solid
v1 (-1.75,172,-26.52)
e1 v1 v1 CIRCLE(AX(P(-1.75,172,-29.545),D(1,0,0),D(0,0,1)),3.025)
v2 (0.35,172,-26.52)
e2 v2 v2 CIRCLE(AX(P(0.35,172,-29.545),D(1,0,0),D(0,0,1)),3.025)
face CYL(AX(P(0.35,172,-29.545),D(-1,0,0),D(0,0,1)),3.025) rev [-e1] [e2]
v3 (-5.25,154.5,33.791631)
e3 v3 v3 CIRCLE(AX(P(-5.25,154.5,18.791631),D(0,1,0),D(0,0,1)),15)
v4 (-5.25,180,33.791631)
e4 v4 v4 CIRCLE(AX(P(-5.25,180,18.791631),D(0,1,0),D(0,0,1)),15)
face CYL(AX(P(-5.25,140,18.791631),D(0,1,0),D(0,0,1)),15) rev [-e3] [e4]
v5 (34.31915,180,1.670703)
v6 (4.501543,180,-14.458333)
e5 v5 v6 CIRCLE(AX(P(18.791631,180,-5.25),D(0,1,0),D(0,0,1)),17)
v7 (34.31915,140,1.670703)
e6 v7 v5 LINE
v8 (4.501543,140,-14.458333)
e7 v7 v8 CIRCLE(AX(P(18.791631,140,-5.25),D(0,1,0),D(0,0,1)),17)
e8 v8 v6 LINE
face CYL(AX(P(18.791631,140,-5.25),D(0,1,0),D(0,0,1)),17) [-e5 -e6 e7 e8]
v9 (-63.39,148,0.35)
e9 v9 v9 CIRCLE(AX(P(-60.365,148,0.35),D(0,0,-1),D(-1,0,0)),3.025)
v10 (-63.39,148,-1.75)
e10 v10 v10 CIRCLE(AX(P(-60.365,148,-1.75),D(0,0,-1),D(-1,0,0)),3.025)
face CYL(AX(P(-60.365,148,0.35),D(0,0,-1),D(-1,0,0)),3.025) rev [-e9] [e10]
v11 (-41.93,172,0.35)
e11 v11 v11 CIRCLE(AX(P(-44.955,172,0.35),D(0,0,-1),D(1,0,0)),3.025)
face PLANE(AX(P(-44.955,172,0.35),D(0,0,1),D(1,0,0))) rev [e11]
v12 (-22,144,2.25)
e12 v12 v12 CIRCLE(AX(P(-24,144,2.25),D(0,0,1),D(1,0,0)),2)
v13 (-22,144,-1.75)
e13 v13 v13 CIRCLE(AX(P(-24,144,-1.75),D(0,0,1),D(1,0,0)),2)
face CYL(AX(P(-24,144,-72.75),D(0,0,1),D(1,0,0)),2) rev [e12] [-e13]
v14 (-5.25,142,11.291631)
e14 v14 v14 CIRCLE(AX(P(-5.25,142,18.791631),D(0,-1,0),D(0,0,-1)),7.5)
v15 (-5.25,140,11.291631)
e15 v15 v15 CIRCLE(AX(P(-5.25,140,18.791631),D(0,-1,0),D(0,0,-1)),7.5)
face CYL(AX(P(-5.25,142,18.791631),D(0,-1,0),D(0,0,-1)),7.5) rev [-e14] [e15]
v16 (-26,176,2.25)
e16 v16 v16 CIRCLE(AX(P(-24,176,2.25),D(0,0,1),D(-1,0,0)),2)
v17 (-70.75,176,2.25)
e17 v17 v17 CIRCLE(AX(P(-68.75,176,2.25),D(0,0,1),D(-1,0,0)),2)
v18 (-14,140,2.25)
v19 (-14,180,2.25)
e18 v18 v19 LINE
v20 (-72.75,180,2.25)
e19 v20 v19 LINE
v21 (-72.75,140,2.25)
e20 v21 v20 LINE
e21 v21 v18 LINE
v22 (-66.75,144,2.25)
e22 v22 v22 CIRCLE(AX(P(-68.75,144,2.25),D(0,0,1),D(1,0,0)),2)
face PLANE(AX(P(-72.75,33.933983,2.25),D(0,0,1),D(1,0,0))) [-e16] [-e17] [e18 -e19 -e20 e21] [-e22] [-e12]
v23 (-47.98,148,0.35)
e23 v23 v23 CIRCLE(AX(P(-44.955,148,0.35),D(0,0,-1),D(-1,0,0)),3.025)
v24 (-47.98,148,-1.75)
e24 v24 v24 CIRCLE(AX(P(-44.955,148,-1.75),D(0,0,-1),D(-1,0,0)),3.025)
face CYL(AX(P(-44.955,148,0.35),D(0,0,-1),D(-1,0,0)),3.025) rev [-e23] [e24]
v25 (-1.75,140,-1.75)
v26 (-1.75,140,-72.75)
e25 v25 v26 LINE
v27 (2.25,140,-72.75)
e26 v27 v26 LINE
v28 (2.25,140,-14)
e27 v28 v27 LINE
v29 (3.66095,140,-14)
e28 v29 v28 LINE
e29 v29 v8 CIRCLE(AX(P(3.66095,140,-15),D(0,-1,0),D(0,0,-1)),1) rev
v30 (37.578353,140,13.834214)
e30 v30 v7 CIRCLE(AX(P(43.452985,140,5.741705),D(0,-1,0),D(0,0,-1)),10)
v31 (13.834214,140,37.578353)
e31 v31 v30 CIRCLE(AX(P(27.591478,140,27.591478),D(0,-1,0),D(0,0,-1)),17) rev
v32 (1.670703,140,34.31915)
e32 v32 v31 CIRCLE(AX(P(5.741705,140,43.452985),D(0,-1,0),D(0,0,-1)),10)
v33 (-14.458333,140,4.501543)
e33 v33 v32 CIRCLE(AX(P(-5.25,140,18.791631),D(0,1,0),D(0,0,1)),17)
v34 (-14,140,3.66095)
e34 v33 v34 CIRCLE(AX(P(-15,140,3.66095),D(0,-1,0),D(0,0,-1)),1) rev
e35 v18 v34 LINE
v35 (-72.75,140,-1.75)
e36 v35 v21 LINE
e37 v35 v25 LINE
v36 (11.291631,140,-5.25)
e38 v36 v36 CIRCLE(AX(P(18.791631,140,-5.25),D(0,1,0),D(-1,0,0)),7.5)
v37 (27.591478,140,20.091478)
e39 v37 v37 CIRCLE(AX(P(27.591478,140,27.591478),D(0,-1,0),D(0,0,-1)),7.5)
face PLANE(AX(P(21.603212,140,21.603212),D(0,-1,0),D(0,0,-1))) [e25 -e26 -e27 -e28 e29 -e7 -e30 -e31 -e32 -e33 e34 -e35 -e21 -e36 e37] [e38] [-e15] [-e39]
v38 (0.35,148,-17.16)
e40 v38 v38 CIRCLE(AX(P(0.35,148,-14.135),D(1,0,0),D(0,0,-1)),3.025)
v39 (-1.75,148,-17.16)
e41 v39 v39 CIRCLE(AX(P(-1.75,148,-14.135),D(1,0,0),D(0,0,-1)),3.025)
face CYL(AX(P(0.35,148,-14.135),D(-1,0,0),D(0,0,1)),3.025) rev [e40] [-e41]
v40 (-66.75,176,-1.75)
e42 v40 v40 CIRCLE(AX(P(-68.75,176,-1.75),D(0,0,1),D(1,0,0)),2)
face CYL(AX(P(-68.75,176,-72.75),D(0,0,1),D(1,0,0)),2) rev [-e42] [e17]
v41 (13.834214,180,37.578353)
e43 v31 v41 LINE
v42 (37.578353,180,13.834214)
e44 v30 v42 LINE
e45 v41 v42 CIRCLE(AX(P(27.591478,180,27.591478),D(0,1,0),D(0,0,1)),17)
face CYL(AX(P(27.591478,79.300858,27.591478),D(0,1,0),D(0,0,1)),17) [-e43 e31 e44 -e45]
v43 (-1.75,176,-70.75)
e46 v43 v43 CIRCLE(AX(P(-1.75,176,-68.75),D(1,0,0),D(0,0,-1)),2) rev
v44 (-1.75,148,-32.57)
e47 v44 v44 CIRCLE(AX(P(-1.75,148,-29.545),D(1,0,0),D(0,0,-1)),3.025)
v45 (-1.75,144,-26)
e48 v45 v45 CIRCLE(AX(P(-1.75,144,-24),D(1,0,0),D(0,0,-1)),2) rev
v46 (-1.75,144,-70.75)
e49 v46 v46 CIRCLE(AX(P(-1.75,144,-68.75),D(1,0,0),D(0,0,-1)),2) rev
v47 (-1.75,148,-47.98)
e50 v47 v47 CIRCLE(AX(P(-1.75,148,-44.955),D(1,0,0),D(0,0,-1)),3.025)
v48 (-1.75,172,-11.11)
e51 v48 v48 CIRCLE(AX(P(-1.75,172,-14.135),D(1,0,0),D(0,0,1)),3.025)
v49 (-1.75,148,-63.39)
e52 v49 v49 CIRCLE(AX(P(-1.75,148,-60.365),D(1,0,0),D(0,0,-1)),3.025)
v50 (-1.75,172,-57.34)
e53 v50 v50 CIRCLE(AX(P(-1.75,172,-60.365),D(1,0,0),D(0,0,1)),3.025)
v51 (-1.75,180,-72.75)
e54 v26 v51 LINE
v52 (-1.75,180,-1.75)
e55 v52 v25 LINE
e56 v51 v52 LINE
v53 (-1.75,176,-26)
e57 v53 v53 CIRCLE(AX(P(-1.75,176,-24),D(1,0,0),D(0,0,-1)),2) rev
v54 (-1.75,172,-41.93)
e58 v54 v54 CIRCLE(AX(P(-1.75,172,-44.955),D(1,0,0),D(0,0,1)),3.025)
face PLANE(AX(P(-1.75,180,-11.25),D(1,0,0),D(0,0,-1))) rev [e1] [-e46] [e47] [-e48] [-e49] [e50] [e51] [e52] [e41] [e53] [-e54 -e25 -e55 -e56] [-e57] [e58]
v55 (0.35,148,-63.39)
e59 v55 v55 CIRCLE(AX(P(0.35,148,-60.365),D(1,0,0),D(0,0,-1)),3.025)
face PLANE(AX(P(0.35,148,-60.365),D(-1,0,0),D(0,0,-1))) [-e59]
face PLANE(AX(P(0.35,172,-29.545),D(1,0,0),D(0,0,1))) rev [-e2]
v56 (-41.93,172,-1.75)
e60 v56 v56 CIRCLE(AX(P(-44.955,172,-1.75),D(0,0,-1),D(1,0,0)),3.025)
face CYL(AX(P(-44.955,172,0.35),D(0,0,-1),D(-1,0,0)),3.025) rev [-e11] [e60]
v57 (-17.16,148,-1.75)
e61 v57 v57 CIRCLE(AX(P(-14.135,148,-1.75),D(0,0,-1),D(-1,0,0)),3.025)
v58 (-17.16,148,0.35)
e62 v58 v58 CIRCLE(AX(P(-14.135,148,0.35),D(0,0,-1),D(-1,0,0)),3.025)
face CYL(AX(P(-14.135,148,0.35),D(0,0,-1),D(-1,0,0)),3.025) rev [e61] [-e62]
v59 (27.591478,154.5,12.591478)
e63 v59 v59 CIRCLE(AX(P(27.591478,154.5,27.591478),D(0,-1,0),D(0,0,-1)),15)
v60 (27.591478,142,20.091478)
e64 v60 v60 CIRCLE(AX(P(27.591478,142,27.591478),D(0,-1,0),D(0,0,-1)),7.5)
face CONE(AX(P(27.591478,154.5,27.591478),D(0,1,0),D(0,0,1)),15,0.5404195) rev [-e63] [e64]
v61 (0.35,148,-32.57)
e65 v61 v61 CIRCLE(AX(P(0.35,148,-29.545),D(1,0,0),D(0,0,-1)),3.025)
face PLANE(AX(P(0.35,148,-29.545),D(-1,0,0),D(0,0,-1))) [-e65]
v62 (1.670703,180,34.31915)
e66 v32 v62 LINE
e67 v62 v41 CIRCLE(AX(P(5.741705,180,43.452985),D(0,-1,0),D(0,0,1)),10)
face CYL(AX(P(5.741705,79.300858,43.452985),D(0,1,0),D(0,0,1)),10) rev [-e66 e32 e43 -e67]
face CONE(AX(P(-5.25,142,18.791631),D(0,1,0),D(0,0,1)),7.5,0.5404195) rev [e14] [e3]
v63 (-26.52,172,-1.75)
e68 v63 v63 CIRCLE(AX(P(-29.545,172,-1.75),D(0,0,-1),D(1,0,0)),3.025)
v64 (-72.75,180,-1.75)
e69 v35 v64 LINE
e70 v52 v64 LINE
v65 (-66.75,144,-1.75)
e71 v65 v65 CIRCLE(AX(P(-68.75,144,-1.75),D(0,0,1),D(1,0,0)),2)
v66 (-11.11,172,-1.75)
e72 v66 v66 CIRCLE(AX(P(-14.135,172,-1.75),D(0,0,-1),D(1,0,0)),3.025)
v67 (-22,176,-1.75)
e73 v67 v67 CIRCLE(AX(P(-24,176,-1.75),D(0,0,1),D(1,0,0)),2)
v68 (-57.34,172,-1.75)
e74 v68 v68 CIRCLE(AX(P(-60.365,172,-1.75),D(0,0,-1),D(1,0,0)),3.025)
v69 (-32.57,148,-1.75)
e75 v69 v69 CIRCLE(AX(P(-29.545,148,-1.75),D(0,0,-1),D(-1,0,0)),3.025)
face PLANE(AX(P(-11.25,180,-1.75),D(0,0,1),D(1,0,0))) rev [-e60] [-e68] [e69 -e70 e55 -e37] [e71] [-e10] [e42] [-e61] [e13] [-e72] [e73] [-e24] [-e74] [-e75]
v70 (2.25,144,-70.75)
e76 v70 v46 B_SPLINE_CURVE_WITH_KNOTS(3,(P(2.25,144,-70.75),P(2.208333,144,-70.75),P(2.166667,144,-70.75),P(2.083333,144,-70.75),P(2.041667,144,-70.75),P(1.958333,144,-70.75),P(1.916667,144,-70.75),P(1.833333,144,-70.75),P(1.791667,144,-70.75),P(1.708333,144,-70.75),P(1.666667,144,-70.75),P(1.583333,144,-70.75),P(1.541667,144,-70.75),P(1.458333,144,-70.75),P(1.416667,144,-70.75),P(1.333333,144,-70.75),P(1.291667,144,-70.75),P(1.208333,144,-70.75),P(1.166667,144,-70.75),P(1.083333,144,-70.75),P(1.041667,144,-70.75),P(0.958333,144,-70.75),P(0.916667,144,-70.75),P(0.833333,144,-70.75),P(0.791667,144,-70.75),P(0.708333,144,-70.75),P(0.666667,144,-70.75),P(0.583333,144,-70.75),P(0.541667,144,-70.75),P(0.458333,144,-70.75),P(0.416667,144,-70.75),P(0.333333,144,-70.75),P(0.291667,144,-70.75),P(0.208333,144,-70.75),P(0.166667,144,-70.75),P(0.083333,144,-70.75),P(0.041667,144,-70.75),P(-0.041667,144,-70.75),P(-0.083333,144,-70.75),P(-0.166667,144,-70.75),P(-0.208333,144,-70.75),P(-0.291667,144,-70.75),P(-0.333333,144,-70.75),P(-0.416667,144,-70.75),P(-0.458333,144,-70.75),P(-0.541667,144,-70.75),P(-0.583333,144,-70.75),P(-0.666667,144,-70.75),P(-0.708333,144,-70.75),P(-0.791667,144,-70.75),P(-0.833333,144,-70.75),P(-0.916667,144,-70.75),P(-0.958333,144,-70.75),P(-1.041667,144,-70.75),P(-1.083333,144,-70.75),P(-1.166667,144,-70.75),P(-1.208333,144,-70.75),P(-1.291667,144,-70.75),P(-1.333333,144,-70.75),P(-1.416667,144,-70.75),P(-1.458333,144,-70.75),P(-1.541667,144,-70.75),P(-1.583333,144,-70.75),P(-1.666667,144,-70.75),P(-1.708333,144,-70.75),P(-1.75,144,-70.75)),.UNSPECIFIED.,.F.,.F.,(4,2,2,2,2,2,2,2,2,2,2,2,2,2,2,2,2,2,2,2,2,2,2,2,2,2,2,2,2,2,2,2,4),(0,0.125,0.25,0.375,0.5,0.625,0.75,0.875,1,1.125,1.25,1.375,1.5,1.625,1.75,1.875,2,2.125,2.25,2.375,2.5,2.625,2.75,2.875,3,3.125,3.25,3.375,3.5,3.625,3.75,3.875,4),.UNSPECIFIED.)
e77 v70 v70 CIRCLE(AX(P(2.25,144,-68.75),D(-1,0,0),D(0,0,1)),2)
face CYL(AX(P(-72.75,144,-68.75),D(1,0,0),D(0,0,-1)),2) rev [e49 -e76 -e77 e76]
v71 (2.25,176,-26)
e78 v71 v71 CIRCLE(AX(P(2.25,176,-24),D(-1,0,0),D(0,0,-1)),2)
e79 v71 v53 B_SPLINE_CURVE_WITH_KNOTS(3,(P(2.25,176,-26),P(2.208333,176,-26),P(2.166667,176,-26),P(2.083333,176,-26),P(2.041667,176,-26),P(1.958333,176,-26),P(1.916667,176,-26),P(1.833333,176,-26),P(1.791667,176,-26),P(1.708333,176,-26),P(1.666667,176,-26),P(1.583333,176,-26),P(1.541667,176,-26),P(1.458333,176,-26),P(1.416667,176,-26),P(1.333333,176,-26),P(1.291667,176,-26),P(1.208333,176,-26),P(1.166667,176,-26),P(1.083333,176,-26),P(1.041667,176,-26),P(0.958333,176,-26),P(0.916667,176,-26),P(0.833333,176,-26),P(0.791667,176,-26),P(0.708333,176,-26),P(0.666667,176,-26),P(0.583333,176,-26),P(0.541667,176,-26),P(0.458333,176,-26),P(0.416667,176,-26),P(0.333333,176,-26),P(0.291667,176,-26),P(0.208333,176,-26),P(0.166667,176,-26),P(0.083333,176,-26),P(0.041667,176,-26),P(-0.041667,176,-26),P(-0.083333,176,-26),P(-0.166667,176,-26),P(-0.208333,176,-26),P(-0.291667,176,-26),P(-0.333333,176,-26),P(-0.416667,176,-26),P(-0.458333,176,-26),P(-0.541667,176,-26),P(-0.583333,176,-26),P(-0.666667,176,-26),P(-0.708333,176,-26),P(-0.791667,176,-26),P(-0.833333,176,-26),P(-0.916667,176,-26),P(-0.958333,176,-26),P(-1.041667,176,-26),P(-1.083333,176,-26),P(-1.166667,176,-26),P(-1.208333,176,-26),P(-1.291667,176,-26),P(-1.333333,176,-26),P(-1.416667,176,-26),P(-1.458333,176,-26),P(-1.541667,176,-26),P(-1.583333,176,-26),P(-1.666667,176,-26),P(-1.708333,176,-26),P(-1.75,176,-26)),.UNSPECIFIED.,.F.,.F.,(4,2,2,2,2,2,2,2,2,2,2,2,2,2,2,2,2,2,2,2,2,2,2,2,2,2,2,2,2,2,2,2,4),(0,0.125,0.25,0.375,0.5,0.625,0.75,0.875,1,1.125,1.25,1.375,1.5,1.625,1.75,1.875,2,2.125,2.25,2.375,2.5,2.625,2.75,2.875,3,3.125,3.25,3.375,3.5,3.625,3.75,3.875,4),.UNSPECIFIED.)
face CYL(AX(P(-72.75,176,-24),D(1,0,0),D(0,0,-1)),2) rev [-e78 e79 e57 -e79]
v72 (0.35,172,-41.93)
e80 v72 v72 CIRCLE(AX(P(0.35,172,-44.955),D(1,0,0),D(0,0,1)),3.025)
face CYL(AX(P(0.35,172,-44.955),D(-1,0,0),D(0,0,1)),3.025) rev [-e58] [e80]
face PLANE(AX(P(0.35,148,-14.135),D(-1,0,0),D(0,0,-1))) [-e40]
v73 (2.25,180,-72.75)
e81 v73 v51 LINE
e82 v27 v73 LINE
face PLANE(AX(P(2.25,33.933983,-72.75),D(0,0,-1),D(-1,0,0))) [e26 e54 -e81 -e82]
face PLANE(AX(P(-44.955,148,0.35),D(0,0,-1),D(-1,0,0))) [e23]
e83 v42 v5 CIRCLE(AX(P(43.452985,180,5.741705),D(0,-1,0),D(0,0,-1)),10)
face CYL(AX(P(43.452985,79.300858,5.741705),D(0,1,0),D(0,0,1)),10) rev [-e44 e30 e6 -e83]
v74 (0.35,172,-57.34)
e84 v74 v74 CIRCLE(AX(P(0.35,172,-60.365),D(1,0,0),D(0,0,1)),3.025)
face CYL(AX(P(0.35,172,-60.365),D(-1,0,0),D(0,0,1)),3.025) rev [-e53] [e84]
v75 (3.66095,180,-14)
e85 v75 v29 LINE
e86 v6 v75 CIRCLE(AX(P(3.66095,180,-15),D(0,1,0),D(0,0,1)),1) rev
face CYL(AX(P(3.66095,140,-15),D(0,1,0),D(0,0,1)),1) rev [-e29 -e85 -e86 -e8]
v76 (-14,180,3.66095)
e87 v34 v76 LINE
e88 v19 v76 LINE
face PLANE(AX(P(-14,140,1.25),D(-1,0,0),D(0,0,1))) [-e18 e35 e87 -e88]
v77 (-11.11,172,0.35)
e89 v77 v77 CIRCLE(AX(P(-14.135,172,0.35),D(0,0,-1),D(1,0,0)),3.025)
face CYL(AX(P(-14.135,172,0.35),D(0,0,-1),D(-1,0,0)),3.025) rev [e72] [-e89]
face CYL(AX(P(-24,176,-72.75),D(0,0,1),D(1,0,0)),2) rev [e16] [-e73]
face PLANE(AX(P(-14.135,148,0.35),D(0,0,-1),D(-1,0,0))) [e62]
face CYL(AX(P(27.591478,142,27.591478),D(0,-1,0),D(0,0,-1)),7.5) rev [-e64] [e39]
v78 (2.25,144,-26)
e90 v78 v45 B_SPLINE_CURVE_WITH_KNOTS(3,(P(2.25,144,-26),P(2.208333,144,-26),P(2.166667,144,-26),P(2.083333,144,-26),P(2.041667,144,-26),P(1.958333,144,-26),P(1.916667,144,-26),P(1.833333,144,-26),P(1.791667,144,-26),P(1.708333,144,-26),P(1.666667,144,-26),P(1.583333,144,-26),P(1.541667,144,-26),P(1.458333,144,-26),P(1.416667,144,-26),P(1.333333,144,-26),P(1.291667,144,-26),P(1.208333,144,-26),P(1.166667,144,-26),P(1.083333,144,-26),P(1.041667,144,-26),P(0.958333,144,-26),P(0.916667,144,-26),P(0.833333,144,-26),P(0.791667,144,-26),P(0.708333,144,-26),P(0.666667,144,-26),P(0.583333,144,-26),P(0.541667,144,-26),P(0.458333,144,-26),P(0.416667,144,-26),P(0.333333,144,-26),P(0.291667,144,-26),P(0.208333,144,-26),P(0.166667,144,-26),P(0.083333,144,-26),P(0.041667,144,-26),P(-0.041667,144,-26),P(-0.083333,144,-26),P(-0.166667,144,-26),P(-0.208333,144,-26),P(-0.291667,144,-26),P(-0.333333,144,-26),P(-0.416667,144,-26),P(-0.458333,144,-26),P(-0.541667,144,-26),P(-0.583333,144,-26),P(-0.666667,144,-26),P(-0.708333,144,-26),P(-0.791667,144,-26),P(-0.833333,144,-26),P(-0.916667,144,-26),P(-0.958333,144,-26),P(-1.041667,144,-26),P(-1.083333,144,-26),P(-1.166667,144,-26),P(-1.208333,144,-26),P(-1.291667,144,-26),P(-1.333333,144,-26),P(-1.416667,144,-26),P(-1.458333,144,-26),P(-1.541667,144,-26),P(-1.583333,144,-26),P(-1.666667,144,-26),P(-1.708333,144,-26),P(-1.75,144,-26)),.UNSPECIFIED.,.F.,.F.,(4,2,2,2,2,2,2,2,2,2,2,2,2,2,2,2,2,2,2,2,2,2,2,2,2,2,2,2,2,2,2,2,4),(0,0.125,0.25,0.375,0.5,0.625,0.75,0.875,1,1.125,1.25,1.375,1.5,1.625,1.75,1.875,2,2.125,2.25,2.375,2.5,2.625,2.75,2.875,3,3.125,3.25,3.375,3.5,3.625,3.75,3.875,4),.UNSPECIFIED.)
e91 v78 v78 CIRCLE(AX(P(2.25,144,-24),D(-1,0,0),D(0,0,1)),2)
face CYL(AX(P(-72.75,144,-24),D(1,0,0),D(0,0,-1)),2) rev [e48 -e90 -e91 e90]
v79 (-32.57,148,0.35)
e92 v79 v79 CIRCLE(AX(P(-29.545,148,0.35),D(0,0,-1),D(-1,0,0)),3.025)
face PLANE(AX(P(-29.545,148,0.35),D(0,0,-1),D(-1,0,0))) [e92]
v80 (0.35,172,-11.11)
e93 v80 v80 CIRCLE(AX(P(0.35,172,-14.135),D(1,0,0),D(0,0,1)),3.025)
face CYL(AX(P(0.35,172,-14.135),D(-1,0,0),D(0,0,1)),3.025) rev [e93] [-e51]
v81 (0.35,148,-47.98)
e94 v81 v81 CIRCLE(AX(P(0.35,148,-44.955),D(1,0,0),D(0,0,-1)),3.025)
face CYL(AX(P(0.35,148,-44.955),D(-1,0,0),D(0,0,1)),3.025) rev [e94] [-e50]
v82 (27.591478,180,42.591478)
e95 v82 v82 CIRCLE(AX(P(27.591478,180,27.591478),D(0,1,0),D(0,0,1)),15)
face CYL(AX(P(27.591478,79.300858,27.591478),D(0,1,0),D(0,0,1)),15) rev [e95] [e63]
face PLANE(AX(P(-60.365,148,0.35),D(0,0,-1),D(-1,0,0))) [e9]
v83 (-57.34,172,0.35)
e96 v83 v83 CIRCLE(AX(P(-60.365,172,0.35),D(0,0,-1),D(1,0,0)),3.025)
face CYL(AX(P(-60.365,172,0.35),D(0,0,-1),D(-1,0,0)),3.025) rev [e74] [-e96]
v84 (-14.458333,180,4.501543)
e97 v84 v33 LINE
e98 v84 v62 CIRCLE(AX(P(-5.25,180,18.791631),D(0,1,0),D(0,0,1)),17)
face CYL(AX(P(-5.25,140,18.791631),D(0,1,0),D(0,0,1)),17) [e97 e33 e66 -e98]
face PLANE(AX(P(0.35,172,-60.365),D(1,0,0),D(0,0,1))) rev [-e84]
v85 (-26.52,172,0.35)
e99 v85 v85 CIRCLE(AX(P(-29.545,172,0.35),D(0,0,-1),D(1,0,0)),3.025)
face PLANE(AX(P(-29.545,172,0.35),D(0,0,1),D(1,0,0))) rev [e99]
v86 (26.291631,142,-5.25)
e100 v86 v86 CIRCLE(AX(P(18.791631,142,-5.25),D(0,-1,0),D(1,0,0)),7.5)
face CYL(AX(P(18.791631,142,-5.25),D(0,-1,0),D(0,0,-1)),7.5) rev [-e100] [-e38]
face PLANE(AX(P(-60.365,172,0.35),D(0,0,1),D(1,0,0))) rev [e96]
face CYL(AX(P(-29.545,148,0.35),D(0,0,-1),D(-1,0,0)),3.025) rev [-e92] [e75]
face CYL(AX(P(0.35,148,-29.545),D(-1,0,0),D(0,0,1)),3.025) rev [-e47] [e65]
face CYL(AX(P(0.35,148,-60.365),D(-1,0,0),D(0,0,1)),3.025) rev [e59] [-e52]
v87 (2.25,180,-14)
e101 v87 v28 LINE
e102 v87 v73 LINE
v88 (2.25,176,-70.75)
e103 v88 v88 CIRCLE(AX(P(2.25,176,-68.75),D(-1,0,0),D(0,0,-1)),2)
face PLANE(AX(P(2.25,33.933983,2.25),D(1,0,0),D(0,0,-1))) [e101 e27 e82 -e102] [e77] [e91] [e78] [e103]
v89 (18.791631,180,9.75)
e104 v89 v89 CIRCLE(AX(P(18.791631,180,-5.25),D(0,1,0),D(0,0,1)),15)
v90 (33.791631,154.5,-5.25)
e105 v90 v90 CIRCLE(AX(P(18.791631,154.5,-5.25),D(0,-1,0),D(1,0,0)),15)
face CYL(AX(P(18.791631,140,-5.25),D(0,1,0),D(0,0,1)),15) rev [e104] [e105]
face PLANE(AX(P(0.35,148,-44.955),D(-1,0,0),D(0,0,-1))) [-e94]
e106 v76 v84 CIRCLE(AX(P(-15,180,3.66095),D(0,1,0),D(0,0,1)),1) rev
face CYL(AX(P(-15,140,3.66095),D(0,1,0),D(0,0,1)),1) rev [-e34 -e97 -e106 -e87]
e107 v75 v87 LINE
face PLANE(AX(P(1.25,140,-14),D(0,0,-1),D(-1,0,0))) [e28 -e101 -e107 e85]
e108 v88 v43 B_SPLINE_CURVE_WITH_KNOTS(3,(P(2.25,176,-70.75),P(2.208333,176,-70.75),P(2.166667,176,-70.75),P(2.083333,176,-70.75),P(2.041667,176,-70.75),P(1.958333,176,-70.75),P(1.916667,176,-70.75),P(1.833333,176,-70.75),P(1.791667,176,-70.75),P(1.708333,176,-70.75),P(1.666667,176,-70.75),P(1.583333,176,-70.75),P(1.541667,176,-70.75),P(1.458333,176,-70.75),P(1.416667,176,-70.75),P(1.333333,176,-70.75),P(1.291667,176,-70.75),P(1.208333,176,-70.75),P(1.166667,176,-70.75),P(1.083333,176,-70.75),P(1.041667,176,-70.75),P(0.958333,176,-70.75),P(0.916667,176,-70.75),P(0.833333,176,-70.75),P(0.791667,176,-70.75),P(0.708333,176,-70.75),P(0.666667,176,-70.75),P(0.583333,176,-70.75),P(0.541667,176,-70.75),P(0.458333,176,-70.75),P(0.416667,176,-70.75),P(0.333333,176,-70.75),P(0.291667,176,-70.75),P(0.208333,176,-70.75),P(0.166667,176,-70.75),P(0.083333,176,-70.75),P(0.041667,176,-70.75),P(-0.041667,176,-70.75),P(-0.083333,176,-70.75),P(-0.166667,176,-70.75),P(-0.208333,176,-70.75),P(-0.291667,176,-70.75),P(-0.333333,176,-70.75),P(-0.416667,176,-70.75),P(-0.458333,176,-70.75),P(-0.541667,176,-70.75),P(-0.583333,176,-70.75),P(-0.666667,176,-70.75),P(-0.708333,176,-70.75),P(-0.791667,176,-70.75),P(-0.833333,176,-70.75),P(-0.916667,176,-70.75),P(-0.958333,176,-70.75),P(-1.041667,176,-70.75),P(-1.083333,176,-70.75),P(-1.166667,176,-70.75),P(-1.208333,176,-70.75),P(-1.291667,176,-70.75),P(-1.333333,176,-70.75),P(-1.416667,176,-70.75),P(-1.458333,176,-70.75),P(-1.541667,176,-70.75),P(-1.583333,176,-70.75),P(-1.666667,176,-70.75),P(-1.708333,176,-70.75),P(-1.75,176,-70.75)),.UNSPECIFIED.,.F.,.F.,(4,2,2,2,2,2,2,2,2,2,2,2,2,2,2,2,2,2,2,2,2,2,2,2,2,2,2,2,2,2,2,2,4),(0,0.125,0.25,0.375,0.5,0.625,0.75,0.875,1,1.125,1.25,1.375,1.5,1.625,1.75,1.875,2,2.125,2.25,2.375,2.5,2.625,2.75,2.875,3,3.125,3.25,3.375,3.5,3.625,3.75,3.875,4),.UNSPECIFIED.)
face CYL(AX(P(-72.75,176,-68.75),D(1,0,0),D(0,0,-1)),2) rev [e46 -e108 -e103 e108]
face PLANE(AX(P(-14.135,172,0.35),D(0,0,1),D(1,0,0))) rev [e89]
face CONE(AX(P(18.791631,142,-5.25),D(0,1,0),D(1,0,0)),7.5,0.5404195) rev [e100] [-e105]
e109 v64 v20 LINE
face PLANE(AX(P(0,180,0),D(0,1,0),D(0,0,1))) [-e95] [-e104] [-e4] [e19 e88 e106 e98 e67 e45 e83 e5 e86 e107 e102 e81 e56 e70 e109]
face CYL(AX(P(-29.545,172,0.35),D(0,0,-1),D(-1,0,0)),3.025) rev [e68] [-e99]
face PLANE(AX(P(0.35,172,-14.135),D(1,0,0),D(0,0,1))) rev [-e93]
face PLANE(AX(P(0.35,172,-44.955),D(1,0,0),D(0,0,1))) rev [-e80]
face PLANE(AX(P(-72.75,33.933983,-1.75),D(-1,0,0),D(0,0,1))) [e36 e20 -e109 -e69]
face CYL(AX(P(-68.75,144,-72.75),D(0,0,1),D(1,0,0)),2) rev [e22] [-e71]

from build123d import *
from build123d.topology import SkipClean

# Parameters (mm, degrees)
SKETCH1_W            = 30
SKETCH1_H            = 30
BOSS_EXTRUDE1_DEPTH  = 80
SKETCH2_R            = 6
BOSS_EXTRUDE2_DEPTH  = 22
CUT_EXTRUDE1_DEPTH   = 83.764726786
BOSS_EXTRUDE3_DEPTH  = 100
BOSS_EXTRUDE5_DEPTH  = 2
BOSS_EXTRUDE6_DEPTH  = 23
BOSS_EXTRUDE7_DEPTH  = 25
FILLET1_R            = 2
SKETCH11_R           = 6.055782361
CUT_EXTRUDE2_DEPTH   = 2.125
SKETCH12_W           = 13.25
SKETCH12_H           = 8.5
CUT_EXTRUDE4_DEPTH   = 13.25
CUT_EXTRUDE5_REACH   = 204.341
SKETCH15_W           = 3.75
SKETCH15_H           = 3.75
FILLET2_R            = 1
CUT_EXTRUDE7_START   = 22
SKETCH16_R           = 6
CUT_EXTRUDE7_DEPTH   = 22
SKETCH17_R           = 15
BOSS_EXTRUDE8_DEPTH  = 40
FILLET3_R            = 1
SKETCH18_R           = 15
SKETCH18_R_2         = 7.5
BOSS_EXTRUDE9_DEPTH  = 2
SKETCH22_R           = 209.016423622
CUT_EXTRUDE8_DEPTH   = 225.815151847
SKETCH23_W           = 22.070362909
SKETCH23_H           = 16.212180161
CUT_EXTRUDE9_DEPTH   = 65.514197169
SKETCH24_R           = 15
BOSS_EXTRUDE10_DEPTH = 40
SKETCH25_R           = 15
SKETCH25_R_2         = 7.5
BOSS_EXTRUDE11_DEPTH = 2
BOSS_EXTRUDE12_DEPTH = 40
SKETCH29_R           = 2
CUT_EXTRUDE10_DEPTH  = 209.128716183
SKETCH30_R           = 3.025
CUT_EXTRUDE11_DEPTH  = 2.1


with BuildPart() as part:
    # Sketch1 → Boss-Extrude1 (new body)
    with BuildSketch(Plane(origin=(0, 0, 0), x_dir=(1, 0, 0), z_dir=(0, 1, 0))):
        Rectangle(SKETCH1_W, SKETCH1_H)
    extrude(amount=BOSS_EXTRUDE1_DEPTH)

    # Sketch2 → Boss-Extrude2 (add)
    with BuildSketch(Plane(origin=(0, 80, 0), x_dir=(1, 0, 0), z_dir=(0, 1, 0))):
        with Locations(Location((9, -9, 0), (0, 0, 270))):
            Circle(SKETCH2_R)
    extrude(amount=BOSS_EXTRUDE2_DEPTH)

    # Sketch3 → Cut-Extrude1 (cut, through all)
    with BuildSketch(Plane(origin=(0, 80, 0), x_dir=(1, 0, 0), z_dir=(0, 1, 0))):
        with BuildLine():
            Line((9, -15), (15, -15))
            Line((15, -15), (15, -9))
            ThreePointArc((15, -9), (13.242640687, -13.242640687), (9, -15))
        make_face()
    extrude(amount=-CUT_EXTRUDE1_DEPTH, mode=Mode.SUBTRACT)

    # Sketch4 → Boss-Extrude3 (add)
    with BuildSketch(Plane(origin=(0, 80, 0), x_dir=(1, 0, 0), z_dir=(0, 1, 0))):
        Polygon((-8.25, 11.25), (-8.25, 8.25), (-11.25, 8.25), (-15, 8.25), (-15, 11.25), (-11.25, 11.25), (-11.25, 15), (-8.25, 15), align=None)
        Polygon((-1.75, 1.75), (-11.25, 1.75), (-15, 1.75), (-15, -1.25), (-11.25, -1.25), (1.25, -1.25), (1.25, 11.25), (1.25, 15), (-1.75, 15), (-1.75, 11.25), align=None)
    extrude(amount=BOSS_EXTRUDE3_DEPTH)

    # Sketch6 → Boss-Extrude5 (add)
    with BuildSketch(Plane.XZ):
        with BuildLine():
            Line((15, -15), (7, -15))
            Line((7, -15), (7, -99.5))
            ThreePointArc((7, -99.5), (2.757359313, -109.742640687), (13, -105.5))
            Line((13, -105.5), (15, -105.5))
            Line((15, -105.5), (15, -15))
        make_face()
    extrude(amount=-BOSS_EXTRUDE5_DEPTH)

    # Sketch7 → Boss-Extrude6 (add)
    with SkipClean():  # the faces are left unmerged after this step: merging them gives an invalid solid
        with BuildSketch(Plane(origin=(0, 2, 0), x_dir=(1, 0, 0), z_dir=(0, 1, 0))):
            with BuildLine():
                Line((9, 111.156854249), (9, 108.964101615))
                ThreePointArc((9, 108.964101615), (7, 101.5), (5, 108.964101615))
                Line((5, 108.964101615), (5, 111.156854249))
                ThreePointArc((5, 111.156854249), (1.086408642, 104.485388128), (7, 99.5))
                Line((7, 99.5), (7, 15))
                Line((7, 15), (15, 15))
                Line((15, 15), (15, 105.5))
                Line((15, 105.5), (13, 105.5))
                ThreePointArc((13, 105.5), (11.898979486, 108.964101615), (9, 111.156854249))
            make_face()
        extrude(amount=BOSS_EXTRUDE6_DEPTH)

    # Sketch9 → Boss-Extrude7 (add)
    with SkipClean():  # the faces are left unmerged after this step: merging them gives an invalid solid
        with BuildSketch(Plane.XZ):
            with BuildLine():
                Line((-15, 15), (-15, 7))
                Line((-15, 7), (-126.175, 7))
                ThreePointArc((-126.175, 7), (-126.252697751, 6.037536458), (-126.48377869, 5.1))
                Line((-126.48377869, 5.1), (-128.797778509, 5.1))
                ThreePointArc((-128.797778509, 5.1), (-136.05, 7), (-128.797778509, 8.9))
                Line((-128.797778509, 8.9), (-126.3, 8.9))
                ThreePointArc((-126.3, 8.9), (-128.491885554, 11.955834237), (-132.050001601, 13.173329766))
                Line((-132.050001601, 13.173329766), (-132.050001601, 15))
                Line((-132.050001601, 15), (-15, 15))
            make_face()
        extrude(amount=-BOSS_EXTRUDE7_DEPTH)

    # Fillet1
    fillet1_edges = [part.edges().sort_by_distance(p)[0] for p in [
        (-126.175, 12.5, 7),
    ]]
    fillet(fillet1_edges, radius=FILLET1_R)

    # Sketch11 → Cut-Extrude2 (cut)
    with SkipClean():  # the faces are left unmerged after this step: merging them gives an invalid solid
        with BuildSketch(Plane.XZ):
            with Locations((-132.175, 7)):
                Circle(SKETCH11_R)
        extrude(amount=-CUT_EXTRUDE2_DEPTH, mode=Mode.SUBTRACT)

    # Sketch12 → Cut-Extrude4 (cut)
    with SkipClean():  # the faces are left unmerged after this step: merging them gives an invalid solid
        with BuildSketch(Plane.ZY.offset(15)):
            with Locations((-8.375, 72.75)):
                Rectangle(SKETCH12_W, SKETCH12_H)
        extrude(amount=-CUT_EXTRUDE4_DEPTH, mode=Mode.SUBTRACT)

    # Sketch15 → Cut-Extrude5 (cut, up to next)
    with BuildSketch(Plane(origin=(0, 80, 0), x_dir=(1, 0, 0), z_dir=(0, 1, 0)), mode=Mode.PRIVATE) as cut_extrude5_sk1:
        with Locations((-13.125, 13.125)):
            Rectangle(SKETCH15_W, SKETCH15_H)
    cut_extrude5_tool1 = extrude(cut_extrude5_sk1.sketch, amount=-CUT_EXTRUDE5_REACH, mode=Mode.PRIVATE) & part.part
    add(cut_extrude5_tool1.solids().sort_by_distance((-13.125, 80, -13.125))[0], mode=Mode.SUBTRACT)

    # Fillet2
    fillet2_edges = [part.edges().sort_by_distance(p)[0] for p in [
        (-11.25, 130, -15),
        (-11.25, 130, -11.25),
        (-15, 130, -11.25),
        (-15, 130, 1.25),
        (1.25, 130, -15),
    ]]
    fillet(fillet2_edges, radius=FILLET2_R)

    # Sketch16 → Cut-Extrude7 (cut)
    with SkipClean():  # the faces are left unmerged after this step: merging them gives an invalid solid
        with BuildSketch(Plane(origin=(0, 80, 0), x_dir=(1, 0, 0), z_dir=(0, 1, 0)).offset(CUT_EXTRUDE7_START)):
            with Locations((9, -9)):
                Circle(SKETCH16_R)
        extrude(amount=-CUT_EXTRUDE7_DEPTH, mode=Mode.SUBTRACT)


with BuildPart() as cut_extrude7_kept_piece:
    # of the separate pieces the step leaves, the one the design keeps (cut_extrude7_pieces_kept)
    add(part.part.solids().sort_by_distance((-15, 80, 0.25))[0])

    # Sketch17 → Boss-Extrude8 (add)
    with SkipClean():  # the faces are left unmerged after this step: merging them gives an invalid solid
        with BuildSketch(Plane(origin=(0, 180, 0), x_dir=(1, 0, 0), z_dir=(0, 1, 0))):
            with BuildLine():
                Line((-14, -1.25), (-14, -4.216394713))
                ThreePointArc((-14, -4.216394713), (-14.384018227, -33.129332993), (11.657578086, -20.561885701))
                ThreePointArc((11.657578086, -20.561885701), (14.532144442, -14.532144442), (20.561885701, -11.657578086))
                ThreePointArc((20.561885701, -11.657578086), (33.129332993, 14.384018227), (4.216394713, 14))
                Line((4.216394713, 14), (1.25, 14))
                Line((1.25, 14), (1.25, -1.25))
                Line((1.25, -1.25), (-14, -1.25))
            make_face()
            with Locations(Location((18.79163056, 5.25, 0), (0, 0, 270))):
                Circle(SKETCH17_R, mode=Mode.SUBTRACT)
            with Locations(Location((-5.25, -18.79163056, 0), (0, 0, 270))):
                Circle(SKETCH17_R, mode=Mode.SUBTRACT)
        extrude(amount=-BOSS_EXTRUDE8_DEPTH)

    # Fillet3
    # the kernel refuses this fillet: 1 mm, written as the material it adds along each edge
    with BuildSketch(Plane(origin=(-14, 140, 1.25), x_dir=(-0.9659258262890684, 0, -0.25881904510252046), z_dir=(0, 1, 0))) as fillet3_piece_1:
        with BuildLine():
            CenterArc((0.776457135, 0.965925826), FILLET3_R, 195, 60)
            Line((-0.189468691, 0.707106781), (0, 0))
            ThreePointArc((0, 0), (0.258819045, 0.034074174), (0.51763809, 0))
        make_face()
    extrude(amount=40)
    with BuildSketch(Plane(origin=(-14, 180, 4.216394713), x_dir=(0, 0, -1), z_dir=(0, -1, 0))) as fillet3_piece_2:
        with BuildLine():
            CenterArc((0.555444904, -1), FILLET3_R, 90, 57.202831704)
            ThreePointArc((-0.285148471, -0.458333333), (-0.140754957, -0.230298516), (0, 0))
            Line((0, 0), (0.555444904, 0))
        make_face()
    extrude(amount=40)
    with BuildSketch(Plane(origin=(1.25, 140, -14), x_dir=(-0.2588190451025201, 0, -0.9659258262890685), z_dir=(0, 1, 0))) as fillet3_piece_3:
        with BuildLine():
            CenterArc((0.776457135, -0.965925826), FILLET3_R, 105, 60)
            Line((-0.189468691, -0.707106781), (0, 0))
            ThreePointArc((0, 0), (0.258819045, -0.034074174), (0.51763809, 0))
        make_face()
    extrude(amount=40)
    with BuildSketch(Plane(origin=(4.216394713, 180, -14), x_dir=(-1, 0, 0), z_dir=(0, -1, 0))) as fillet3_piece_4:
        with BuildLine():
            CenterArc((0.555444904, 1), FILLET3_R, 212.797168296, 57.202831704)
            ThreePointArc((-0.285148471, 0.458333333), (-0.140754957, 0.230298516), (0, 0))
            Line((0, 0), (0.555444904, 0))
        make_face()
    extrude(amount=40)

    # Sketch18 → Boss-Extrude9 (add)
    with SkipClean():  # the faces are left unmerged after this step: merging them gives an invalid solid
        with BuildSketch(Plane.XZ.offset(-140)):
            with Locations(Location((-5.25, 18.79163056, 0), (0, 0, 90))):
                Circle(SKETCH18_R)
            with Locations(Location((-5.25, 18.79163056, 0), (0, 0, 270))):
                Circle(SKETCH18_R_2, mode=Mode.SUBTRACT)
        boss_extrude9 = extrude(amount=-BOSS_EXTRUDE9_DEPTH)

    # Sketch21 → Revolve1 (revolve)
    with SkipClean():  # the faces are left unmerged after this step: merging them gives an invalid solid
        with BuildSketch(Plane(origin=(-5.25, 0, 0), x_dir=(0, 0, -1), z_dir=(-1, 0, 0)), mode=Mode.PRIVATE) as revolve1_sk:
            Polygon((-11.29163056, -142), (-3.79163056, -154.5), (-3.79163056, -142), align=None)
        revolve1 = revolve(revolve1_sk.sketch.rotate(Axis((-5.25, 1065, 18.79163056), (0, -1, 0)), 180), axis=Axis((-5.25, 1065, 18.79163056), (0, -1, 0)))

    # Mirror1: Boss-Extrude9, Revolve1 across plane
    with SkipClean():  # the faces are left unmerged after this step: merging them gives an invalid solid
        add(boss_extrude9.mirror(Plane(origin=(0, 0, 0), x_dir=(0.7071067811865478, 0, 0.7071067811865472), z_dir=(0.7071067811865475, 0, -0.7071067811865477))))
        add(revolve1.mirror(Plane(origin=(0, 0, 0), x_dir=(0.7071067811865478, 0, 0.7071067811865472), z_dir=(0.7071067811865475, 0, -0.7071067811865477))))

    # Sketch22 → Cut-Extrude8 (cut, through all)
    with BuildSketch(Plane.XZ.offset(-140)):
        Circle(SKETCH22_R)
    extrude(amount=CUT_EXTRUDE8_DEPTH, mode=Mode.SUBTRACT)


with BuildPart() as cut_extrude8_piece_1:
    # of the separate pieces the step leaves, piece 1, a body of its own (cut_extrude8_pieces)
    add(cut_extrude7_kept_piece.part.solids().sort_by_distance((4.501543184, 180, -14.458333333))[0])

    # Sketch24 → Boss-Extrude10 (add)
    with BuildSketch(Plane(origin=(0, 180, 0), x_dir=(1, 0, 0), z_dir=(0, 1, 0))):
        with BuildLine():
            ThreePointArc((13.834213525, -37.57835306), (39.612293374, -39.612293374), (37.57835306, -13.834213525))
            ThreePointArc((37.57835306, -13.834213525), (33.79372713, -8.329895406), (34.31915027, -1.67070312))
            ThreePointArc((34.31915027, -1.67070312), (28.778505526, -8.507264569), (20.561885701, -11.657578086))
            ThreePointArc((20.561885701, -11.657578086), (14.532144442, -14.532144442), (11.657578086, -20.561885701))
            ThreePointArc((11.657578086, -20.561885701), (8.507264569, -28.778505526), (1.67070312, -34.31915027))
            ThreePointArc((1.67070312, -34.31915027), (8.329895406, -33.79372713), (13.834213525, -37.57835306))
        make_face()
        with Locations(Location((27.591478094, -27.591478094, 0), (0, 0, 270))):
            Circle(SKETCH24_R, mode=Mode.SUBTRACT)
    extrude(amount=-BOSS_EXTRUDE10_DEPTH)

    # Sketch25 → Boss-Extrude11 (add)
    with BuildSketch(Plane.XZ.offset(-140)):
        with Locations(Location((27.591478094, 27.591478094, 0), (0, 0, 90))):
            Circle(SKETCH25_R)
        with Locations(Location((27.591478094, 27.591478094, 0), (0, 0, 270))):
            Circle(SKETCH25_R_2, mode=Mode.SUBTRACT)
    extrude(amount=-BOSS_EXTRUDE11_DEPTH)

    # Sketch26 → Revolve2 (revolve)
    with BuildSketch(Plane(origin=(0, 0, 0), x_dir=(-0.7071067811865476, 0, -0.7071067811865475), z_dir=(0.7071067811865475, 0, -0.7071067811865476)), mode=Mode.PRIVATE) as revolve2_sk:
        Polygon((-24.020242526, 142), (-24.020242526, 154.5), (-31.520242526, 142), align=None)
    revolve(revolve2_sk.sketch.rotate(Axis((27.591478094, 126.995387654, 27.591478094), (0, 1, 0)), 135), axis=Axis((27.591478094, 126.995387654, 27.591478094), (0, 1, 0)))

    # Sketch27 → Boss-Extrude12 (add)
    with BuildSketch(Plane(origin=(0, 180, 0), x_dir=(1, 0, 0), z_dir=(0, 1, 0))):
        Polygon((2.25, -2.25), (2.25, 72.75), (-1.75, 72.75), (-1.75, 1.75), (-72.75, 1.75), (-72.75, -2.25), align=None)
    extrude(amount=-BOSS_EXTRUDE12_DEPTH)

    # Sketch29 → Cut-Extrude10 (cut, through all)
    with BuildSketch(Plane.XY.offset(2.25)):
        with Locations((-24, 144)):
            Circle(SKETCH29_R)
        with Locations((-24, 176)):
            Circle(SKETCH29_R)
        with Locations((-68.75, 144)):
            Circle(SKETCH29_R)
        with Locations((-68.75, 176)):
            Circle(SKETCH29_R)
    cut_extrude10 = extrude(amount=-CUT_EXTRUDE10_DEPTH, mode=Mode.SUBTRACT)

    # Sketch30 → Cut-Extrude11 (cut)
    with BuildSketch(Plane(origin=(0, 0, -1.75), x_dir=(-1, 0, 0), z_dir=(0, 0, -1))):
        with Locations((14.135, 148)):
            Circle(SKETCH30_R)
        with Locations((29.545, 148)):
            Circle(SKETCH30_R)
        with Locations((44.955, 148)):
            Circle(SKETCH30_R)
        with Locations((60.365, 148)):
            Circle(SKETCH30_R)
        with Locations(Location((60.365, 172, 0), (0, 0, 180))):
            Circle(SKETCH30_R)
        with Locations(Location((44.955, 172, 0), (0, 0, 180))):
            Circle(SKETCH30_R)
        with Locations(Location((29.545, 172, 0), (0, 0, 180))):
            Circle(SKETCH30_R)
        with Locations(Location((14.135, 172, 0), (0, 0, 180))):
            Circle(SKETCH30_R)
    cut_extrude11 = extrude(amount=-CUT_EXTRUDE11_DEPTH, mode=Mode.SUBTRACT)

    # Mirror2: Cut-Extrude10, Cut-Extrude11 across plane
    add(cut_extrude10.mirror(Plane(origin=(0, 0, 0), x_dir=(0.7071067811865476, 0, 0.7071067811865475), z_dir=(0.7071067811865475, 0, -0.7071067811865476))), mode=Mode.SUBTRACT)
    add(cut_extrude11.mirror(Plane(origin=(0, 0, 0), x_dir=(0.7071067811865476, 0, 0.7071067811865475), z_dir=(0.7071067811865475, 0, -0.7071067811865476))), mode=Mode.SUBTRACT)


with BuildPart() as cut_extrude8_piece_2:
    # of the separate pieces the step leaves, piece 2, a body of its own (cut_extrude8_pieces)
    add(cut_extrude7_kept_piece.part.solids().sort_by_distance((-10.25, 140, -15))[0])

    # Sketch23 → Cut-Extrude9 (cut, through all)
    with BuildSketch(Plane(origin=(0, 180, 0), x_dir=(1, 0, 0), z_dir=(0, 1, 0))):
        with Locations((-15.719387653, 13.178118111)):
            Rectangle(SKETCH23_W, SKETCH23_H)
    extrude(amount=-CUT_EXTRUDE9_DEPTH, mode=Mode.SUBTRACT)


solid = cut_extrude8_piece_1.part
